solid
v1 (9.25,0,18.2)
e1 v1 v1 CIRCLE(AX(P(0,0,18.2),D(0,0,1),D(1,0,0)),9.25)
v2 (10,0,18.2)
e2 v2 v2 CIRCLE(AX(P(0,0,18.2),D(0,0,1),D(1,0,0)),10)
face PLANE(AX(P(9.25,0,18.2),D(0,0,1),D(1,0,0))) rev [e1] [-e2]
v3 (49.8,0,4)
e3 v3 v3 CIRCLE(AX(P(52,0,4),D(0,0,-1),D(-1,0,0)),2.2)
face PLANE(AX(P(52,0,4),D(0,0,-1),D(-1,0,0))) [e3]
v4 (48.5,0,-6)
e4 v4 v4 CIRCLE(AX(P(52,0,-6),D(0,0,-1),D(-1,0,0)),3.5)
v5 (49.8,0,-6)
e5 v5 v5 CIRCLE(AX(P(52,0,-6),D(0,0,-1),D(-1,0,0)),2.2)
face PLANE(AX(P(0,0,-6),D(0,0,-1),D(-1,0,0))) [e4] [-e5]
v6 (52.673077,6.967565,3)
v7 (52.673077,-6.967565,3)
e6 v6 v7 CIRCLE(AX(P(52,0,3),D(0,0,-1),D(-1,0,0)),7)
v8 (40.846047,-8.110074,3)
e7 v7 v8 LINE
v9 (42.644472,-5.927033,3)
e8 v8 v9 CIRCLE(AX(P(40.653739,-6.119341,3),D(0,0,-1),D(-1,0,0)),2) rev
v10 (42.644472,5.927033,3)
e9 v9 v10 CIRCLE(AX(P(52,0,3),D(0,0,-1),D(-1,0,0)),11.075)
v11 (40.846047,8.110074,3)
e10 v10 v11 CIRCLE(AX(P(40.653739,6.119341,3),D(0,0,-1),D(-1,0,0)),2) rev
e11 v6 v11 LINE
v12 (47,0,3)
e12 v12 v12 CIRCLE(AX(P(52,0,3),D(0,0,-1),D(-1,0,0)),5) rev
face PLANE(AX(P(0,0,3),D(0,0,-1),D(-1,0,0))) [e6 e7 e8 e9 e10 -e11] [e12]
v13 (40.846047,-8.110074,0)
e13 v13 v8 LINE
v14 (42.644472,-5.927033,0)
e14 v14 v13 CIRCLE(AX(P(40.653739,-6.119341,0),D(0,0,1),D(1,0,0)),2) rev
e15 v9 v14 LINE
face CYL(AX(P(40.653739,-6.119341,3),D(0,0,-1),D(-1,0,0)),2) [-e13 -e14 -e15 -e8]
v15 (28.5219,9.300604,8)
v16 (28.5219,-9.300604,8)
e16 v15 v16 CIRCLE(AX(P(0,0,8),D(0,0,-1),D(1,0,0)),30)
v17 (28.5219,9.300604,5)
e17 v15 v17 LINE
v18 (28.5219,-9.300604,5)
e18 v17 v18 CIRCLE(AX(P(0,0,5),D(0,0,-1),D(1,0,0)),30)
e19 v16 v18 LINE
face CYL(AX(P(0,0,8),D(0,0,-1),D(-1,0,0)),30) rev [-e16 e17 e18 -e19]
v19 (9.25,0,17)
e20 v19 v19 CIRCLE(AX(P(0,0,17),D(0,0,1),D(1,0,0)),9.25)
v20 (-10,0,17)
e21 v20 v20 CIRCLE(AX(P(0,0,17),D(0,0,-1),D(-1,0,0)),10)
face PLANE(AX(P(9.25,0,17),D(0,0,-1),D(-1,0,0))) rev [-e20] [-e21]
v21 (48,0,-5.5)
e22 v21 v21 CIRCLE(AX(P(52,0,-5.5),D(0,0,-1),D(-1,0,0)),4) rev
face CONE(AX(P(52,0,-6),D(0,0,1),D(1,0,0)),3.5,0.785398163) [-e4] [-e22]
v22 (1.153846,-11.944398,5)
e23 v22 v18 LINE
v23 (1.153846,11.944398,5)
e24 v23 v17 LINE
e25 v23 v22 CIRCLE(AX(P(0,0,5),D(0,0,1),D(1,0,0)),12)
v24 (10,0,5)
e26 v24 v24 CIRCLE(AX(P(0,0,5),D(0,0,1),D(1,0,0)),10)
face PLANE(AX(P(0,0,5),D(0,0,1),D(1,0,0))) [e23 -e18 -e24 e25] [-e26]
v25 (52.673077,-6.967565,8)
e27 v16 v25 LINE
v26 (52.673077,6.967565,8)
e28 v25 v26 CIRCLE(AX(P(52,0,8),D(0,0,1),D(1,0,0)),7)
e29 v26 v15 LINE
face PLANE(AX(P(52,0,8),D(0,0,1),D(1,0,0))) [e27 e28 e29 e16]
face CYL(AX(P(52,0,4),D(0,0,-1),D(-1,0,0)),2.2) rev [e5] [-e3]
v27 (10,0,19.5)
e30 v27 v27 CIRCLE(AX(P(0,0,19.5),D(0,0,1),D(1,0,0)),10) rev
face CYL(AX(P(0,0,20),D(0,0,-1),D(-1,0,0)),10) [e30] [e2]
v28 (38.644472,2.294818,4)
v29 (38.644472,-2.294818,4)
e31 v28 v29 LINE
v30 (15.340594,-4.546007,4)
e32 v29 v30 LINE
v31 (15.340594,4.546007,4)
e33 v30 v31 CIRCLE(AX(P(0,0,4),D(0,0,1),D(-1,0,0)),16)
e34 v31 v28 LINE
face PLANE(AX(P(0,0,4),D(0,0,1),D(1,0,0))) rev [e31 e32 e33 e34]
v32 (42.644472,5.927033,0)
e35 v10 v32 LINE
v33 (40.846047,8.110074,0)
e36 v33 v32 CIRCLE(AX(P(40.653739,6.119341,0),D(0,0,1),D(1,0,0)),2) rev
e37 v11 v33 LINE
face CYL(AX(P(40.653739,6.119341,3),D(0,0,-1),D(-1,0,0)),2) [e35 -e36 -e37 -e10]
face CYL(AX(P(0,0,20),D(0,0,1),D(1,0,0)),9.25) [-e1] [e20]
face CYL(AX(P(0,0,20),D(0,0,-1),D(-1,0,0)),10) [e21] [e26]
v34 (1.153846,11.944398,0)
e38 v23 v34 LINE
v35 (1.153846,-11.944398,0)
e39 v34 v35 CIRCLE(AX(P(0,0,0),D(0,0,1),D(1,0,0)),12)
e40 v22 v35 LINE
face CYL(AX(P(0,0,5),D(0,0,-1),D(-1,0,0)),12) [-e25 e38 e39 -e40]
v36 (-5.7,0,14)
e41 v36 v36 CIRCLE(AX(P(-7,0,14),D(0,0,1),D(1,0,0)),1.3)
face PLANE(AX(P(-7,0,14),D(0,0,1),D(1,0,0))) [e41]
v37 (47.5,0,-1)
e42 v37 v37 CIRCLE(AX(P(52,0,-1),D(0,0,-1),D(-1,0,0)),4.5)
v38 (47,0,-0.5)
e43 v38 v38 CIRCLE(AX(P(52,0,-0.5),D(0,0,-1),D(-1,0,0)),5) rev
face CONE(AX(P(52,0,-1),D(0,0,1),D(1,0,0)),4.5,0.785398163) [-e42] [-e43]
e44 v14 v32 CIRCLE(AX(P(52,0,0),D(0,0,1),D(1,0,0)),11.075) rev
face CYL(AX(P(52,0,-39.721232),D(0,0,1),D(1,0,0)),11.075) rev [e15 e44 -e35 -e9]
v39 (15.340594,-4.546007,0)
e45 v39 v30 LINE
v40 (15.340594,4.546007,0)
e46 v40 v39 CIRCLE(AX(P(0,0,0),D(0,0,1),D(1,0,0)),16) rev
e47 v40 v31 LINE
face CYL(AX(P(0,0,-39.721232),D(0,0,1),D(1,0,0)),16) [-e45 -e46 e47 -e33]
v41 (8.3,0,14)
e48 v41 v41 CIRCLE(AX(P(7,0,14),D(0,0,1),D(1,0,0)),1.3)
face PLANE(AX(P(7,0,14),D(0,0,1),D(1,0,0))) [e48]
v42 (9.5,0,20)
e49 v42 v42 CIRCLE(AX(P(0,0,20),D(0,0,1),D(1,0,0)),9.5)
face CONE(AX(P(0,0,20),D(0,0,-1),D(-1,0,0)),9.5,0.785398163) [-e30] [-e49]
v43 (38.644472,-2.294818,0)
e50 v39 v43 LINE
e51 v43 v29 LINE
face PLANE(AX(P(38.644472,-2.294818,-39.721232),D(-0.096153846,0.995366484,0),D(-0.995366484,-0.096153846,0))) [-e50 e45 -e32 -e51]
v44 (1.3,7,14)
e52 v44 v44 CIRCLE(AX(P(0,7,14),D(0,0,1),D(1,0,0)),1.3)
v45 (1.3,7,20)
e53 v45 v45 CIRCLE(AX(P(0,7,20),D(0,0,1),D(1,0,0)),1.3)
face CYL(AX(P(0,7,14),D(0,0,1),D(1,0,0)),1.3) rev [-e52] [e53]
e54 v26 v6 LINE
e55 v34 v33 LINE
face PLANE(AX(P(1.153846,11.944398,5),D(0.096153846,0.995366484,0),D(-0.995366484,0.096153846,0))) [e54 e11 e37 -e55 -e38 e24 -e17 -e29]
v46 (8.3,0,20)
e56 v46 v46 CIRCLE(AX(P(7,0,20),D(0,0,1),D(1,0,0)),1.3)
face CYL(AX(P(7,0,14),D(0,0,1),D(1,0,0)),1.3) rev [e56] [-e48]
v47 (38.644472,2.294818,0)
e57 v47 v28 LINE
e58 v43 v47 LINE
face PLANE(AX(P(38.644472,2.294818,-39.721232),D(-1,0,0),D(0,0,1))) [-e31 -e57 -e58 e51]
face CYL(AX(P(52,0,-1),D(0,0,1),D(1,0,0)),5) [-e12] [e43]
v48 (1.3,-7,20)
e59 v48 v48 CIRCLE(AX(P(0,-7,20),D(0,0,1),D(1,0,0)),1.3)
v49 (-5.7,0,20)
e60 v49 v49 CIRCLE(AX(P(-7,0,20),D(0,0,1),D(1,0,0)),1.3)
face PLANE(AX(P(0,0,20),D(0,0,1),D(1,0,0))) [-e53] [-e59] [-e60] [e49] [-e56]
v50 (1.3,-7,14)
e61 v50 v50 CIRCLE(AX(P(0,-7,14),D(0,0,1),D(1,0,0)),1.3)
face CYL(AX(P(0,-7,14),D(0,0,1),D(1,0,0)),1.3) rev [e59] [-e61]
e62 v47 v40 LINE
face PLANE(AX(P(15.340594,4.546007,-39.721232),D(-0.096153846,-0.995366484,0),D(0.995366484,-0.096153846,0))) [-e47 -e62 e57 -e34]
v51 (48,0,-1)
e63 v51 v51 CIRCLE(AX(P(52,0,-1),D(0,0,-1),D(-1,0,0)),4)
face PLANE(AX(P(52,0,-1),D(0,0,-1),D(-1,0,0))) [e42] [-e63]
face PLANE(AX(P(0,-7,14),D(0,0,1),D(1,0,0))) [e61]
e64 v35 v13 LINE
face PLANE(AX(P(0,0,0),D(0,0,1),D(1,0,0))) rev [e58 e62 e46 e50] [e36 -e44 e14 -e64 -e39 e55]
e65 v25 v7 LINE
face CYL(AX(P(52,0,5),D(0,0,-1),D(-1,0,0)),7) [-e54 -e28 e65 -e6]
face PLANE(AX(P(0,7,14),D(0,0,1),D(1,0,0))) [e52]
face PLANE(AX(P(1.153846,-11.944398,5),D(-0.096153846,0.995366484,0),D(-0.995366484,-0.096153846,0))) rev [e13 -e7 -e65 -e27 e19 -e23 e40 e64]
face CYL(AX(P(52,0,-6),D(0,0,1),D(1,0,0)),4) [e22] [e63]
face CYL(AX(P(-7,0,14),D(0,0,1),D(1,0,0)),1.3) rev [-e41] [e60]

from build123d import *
from build123d.topology import SkipClean

# Parameters (mm, degrees)
EXTRUDE_1_DEPTH     = 5
SKETCH_2_R          = 10
EXTRUDE_2_DEPTH     = 15
SKETCH_3_R          = 4
EXTRUDE_3_DEPTH     = 6
SKETCH_4_R          = 5
SKETCH_4_R_2        = 4
EXTRUDE_4_DEPTH     = 1
CHAMFER_1_SIZE      = 0.5
SKETCH_6_R          = 1.3
CUT_EXTRUDE_2_DEPTH = 6
SKETCH_11_R         = 2.2
CUT_EXTRUDE_7_DEPTH = 10
CUT_EXTRUDE_START   = -5
CUT_EXTRUDE_8_DEPTH = 5
SKETCH_14_R         = 5
CUT_EXTRUDE_9_DEPTH = 3
EXTRUDE_START       = -1
SKETCH_15_R         = 10
EXTRUDE_5_DEPTH     = 1
FILLET_1_R          = 2
SKETCH_16_W         = 4.663078912
SKETCH_16_H         = 1.2
EXTRUDE_6_DEPTH     = 4
EXTRUDE_START_2     = 1
EXTRUDE_7_DEPTH     = 1
EXTRUDE_8_DEPTH     = 3


with BuildPart() as part:
    # 草图1 → 凸台-拉伸1 (new body)
    with BuildSketch(Plane.XY):
        with BuildLine():
            Line((52.673076923, 6.967565389), (1.153846154, 11.94439781))
            ThreePointArc((1.153846154, 11.94439781), (-12, 0), (1.153846154, -11.94439781))
            Line((1.153846154, -11.94439781), (52.673076923, -6.967565389))
            ThreePointArc((52.673076923, -6.967565389), (59, 0), (52.673076923, 6.967565389))
        make_face()
    extrude(amount=EXTRUDE_1_DEPTH)

    # 草图2 → 凸台-拉伸2 (add)
    with BuildSketch(Plane.XY.offset(5)):
        Circle(SKETCH_2_R)
    extrude(amount=EXTRUDE_2_DEPTH)

    # 草图3 → 凸台-拉伸3 (add)
    with BuildSketch(Plane(origin=(0, 0, 0), x_dir=(-1, 0, 0), z_dir=(0, 0, -1))):
        with Locations((-52, 0)):
            Circle(SKETCH_3_R)
    extrude(amount=EXTRUDE_3_DEPTH)

    # 草图4 → 凸台-拉伸4 (add)
    with BuildSketch(Plane(origin=(0, 0, 0), x_dir=(-1, 0, 0), z_dir=(0, 0, -1))):
        with Locations(Location((-52, 0, 0), (0, 0, 180))):
            Circle(SKETCH_4_R)
        with Locations((-52, 0)):
            Circle(SKETCH_4_R_2, mode=Mode.SUBTRACT)
    extrude(amount=EXTRUDE_4_DEPTH)

    # 倒角1
    chamfer_1_edges = [part.edges().sort_by_distance(p)[0] for p in [
        (-10, 0, 20),
        (56, 0, -6),
        (47, 0, -1),
    ]]
    chamfer(chamfer_1_edges, length=CHAMFER_1_SIZE)

    # 草图6 → 切除-拉伸2 (cut)
    with BuildSketch(Plane.XY.offset(20)):
        with Locations((0, 7)):
            Circle(SKETCH_6_R)
        with Locations((7, 0)):
            Circle(SKETCH_6_R)
        with Locations((0, -7)):
            Circle(SKETCH_6_R)
        with Locations((-7, 0)):
            Circle(SKETCH_6_R)
    extrude(amount=-CUT_EXTRUDE_2_DEPTH, mode=Mode.SUBTRACT)

    # 草图11 → 切除-拉伸7 (cut)
    with BuildSketch(Plane(origin=(0, 0, -6), x_dir=(-1, 0, 0), z_dir=(0, 0, -1))):
        with Locations((-52, 0)):
            Circle(SKETCH_11_R)
    extrude(amount=-CUT_EXTRUDE_7_DEPTH, mode=Mode.SUBTRACT)

    # 草图12 → 切除-拉伸8 (cut)
    with BuildSketch(Plane.XY.offset(5).offset(CUT_EXTRUDE_START)):
        with BuildLine():
            Line((47.604489244, 5.447888141), (7.564052776, 9.315852382))
            ThreePointArc((7.564052776, 9.315852382), (10.834404305, 5.159038995), (12, 0))
            ThreePointArc((12, 0), (10.834404305, -5.159038995), (7.564052776, -9.315852382))
            Line((7.564052776, -9.315852382), (47.604489244, -5.447888141))
            ThreePointArc((47.604489244, -5.447888141), (45, 0), (47.604489244, 5.447888141))
        make_face()
    extrude(amount=CUT_EXTRUDE_8_DEPTH, mode=Mode.SUBTRACT)

    # 草图14 → 切除-拉伸9 (cut)
    # profile 1 of 2: a face of its own
    with BuildSketch(Plane(origin=(0, 0, 0), x_dir=(-1, 0, 0), z_dir=(0, 0, -1))):
        with BuildLine():
            Line((-52.673076923, 6.967565389), (-44.130557544, 7.792785152))
            ThreePointArc((-44.130557544, 7.792785152), (-63.075, 0), (-44.130557544, -7.792785152))
            Line((-44.130557544, -7.792785152), (-52.673076923, -6.967565389))
            ThreePointArc((-52.673076923, -6.967565389), (-59, 0), (-52.673076923, 6.967565389))
        make_face()
    # profile 2 of 2: a face of its own
    with BuildSketch(Plane(origin=(0, 0, 0), x_dir=(-1, 0, 0), z_dir=(0, 0, -1))):
        with BuildLine():
            ThreePointArc((-44.130557544, -7.792785152), (-41.757693126, -4.213166849), (-40.925, 0))
            ThreePointArc((-40.925, 0), (-41.757693126, 4.213166849), (-44.130557544, 7.792785152))
            Line((-44.130557544, 7.792785152), (-52.673076923, 6.967565389))
            ThreePointArc((-52.673076923, 6.967565389), (-59, 0), (-52.673076923, -6.967565389))
            Line((-52.673076923, -6.967565389), (-44.130557544, -7.792785152))
        make_face()
        with Locations((-52, 0)):
            Circle(SKETCH_14_R, mode=Mode.SUBTRACT)
    extrude(amount=-CUT_EXTRUDE_9_DEPTH, mode=Mode.SUBTRACT)

    # 草图15 → 凸台-拉伸5 (add)
    # profile 1 of 2: a face of its own
    with SkipClean():  # the faces are left unmerged after this step: merging them gives an invalid solid
        with BuildSketch(Plane.XY.offset(5).offset(EXTRUDE_START)):
            with BuildLine():
                ThreePointArc((1.153846154, 11.94439781), (-12, 0), (1.153846154, -11.94439781))
                Line((1.153846154, -11.94439781), (52.673076923, -6.967565389))
                ThreePointArc((52.673076923, -6.967565389), (59, 0), (52.673076923, 6.967565389))
                Line((52.673076923, 6.967565389), (1.153846154, 11.94439781))
            make_face()
            Circle(SKETCH_15_R, mode=Mode.SUBTRACT)
            with BuildLine():
                ThreePointArc((7.564052776, -9.315852382), (12, 0), (7.564052776, 9.315852382))
                Line((7.564052776, 9.315852382), (47.604489244, 5.447888141))
                ThreePointArc((47.604489244, 5.447888141), (45, 0), (47.604489244, -5.447888141))
                Line((47.604489244, -5.447888141), (7.564052776, -9.315852382))
            make_face(mode=Mode.SUBTRACT)
        # profile 2 of 2: a face of its own
        with BuildSketch(Plane.XY.offset(5).offset(EXTRUDE_START)):
            with BuildLine():
                Line((47.604489244, 5.447888141), (7.564052776, 9.315852382))
                ThreePointArc((7.564052776, 9.315852382), (12, 0), (7.564052776, -9.315852382))
                Line((7.564052776, -9.315852382), (47.604489244, -5.447888141))
                ThreePointArc((47.604489244, -5.447888141), (45, 0), (47.604489244, 5.447888141))
            make_face()
        extrude(amount=EXTRUDE_5_DEPTH)
    add(part.part.scale(1), mode=Mode.REPLACE)  # the faces are merged on a copy

    # 圆角1
    # the kernel refuses this fillet: 2 mm, written as the material it takes off along each edge
    with BuildSketch(Plane(origin=(44.130557544, -7.792785152, -8.249501326), x_dir=(-0.9953664842005795, -0.09615384615384645, 0), z_dir=(0, 0, 1)), Plane(origin=(44.130557544, 7.792785152, 3), x_dir=(-0.9953664842005796, 0.09615384615384538, 0), z_dir=(0, 0, -1))) as fillet_1_piece_1:
        with BuildLine():
            CenterArc((3.29980053, -2), FILLET_1_R, 90, 90)
            ThreePointArc((1.29980053, -2), (0.703900692, -0.964905108), (0, 0))
            Line((0, 0), (3.29980053, 0))
        make_face()
    extrude(amount=11.249501326, mode=Mode.SUBTRACT)

    # 草图16 → 切除-旋转1 (revolve, cut)
    with BuildSketch(Plane(origin=(0, 0, 0), x_dir=(1, 0, 0), z_dir=(0, 1, 0))):
        with Locations((11.581539456, -17.6)):
            Rectangle(SKETCH_16_W, SKETCH_16_H)
    revolve(axis=Axis((0, 0, 20), (0, 0, -1)), mode=Mode.SUBTRACT)

    # 草图17 → 凸台-拉伸6 (add)
    with BuildSketch(Plane(origin=(0, 0, 4), x_dir=(-1, 0, 0), z_dir=(0, 0, -1))):
        with BuildLine():
            Line((-7.564052776, 9.315852382), (-42.644471967, 5.927033004))
            ThreePointArc((-42.644471967, 5.927033004), (-40.925, 0), (-42.644471967, -5.927033004))
            Line((-42.644471967, -5.927033004), (-7.564052776, -9.315852382))
            ThreePointArc((-7.564052776, -9.315852382), (-12, 0), (-7.564052776, 9.315852382))
        make_face()
        with BuildLine():
            Line((-38.644471967, 2.294818465), (-38.644471967, -2.294818465))
            Line((-38.644471967, -2.294818465), (-15.340593905, -4.546006888))
            ThreePointArc((-15.340593905, -4.546006888), (-16, 0), (-15.340593905, 4.546006888))
            Line((-15.340593905, 4.546006888), (-38.644471967, 2.294818465))
        make_face(mode=Mode.SUBTRACT)
    extrude(amount=EXTRUDE_6_DEPTH)

    # 草图18 → 凸台-拉伸7 (add)
    with BuildSketch(Plane(origin=(0, 0, 4), x_dir=(-1, 0, 0), z_dir=(0, 0, -1)).offset(EXTRUDE_START_2)):
        with BuildLine():
            Line((-42.644471967, 5.927033004), (-47.604489244, 5.447888141))
            ThreePointArc((-47.604489244, 5.447888141), (-45, 0), (-47.604489244, -5.447888141))
            Line((-47.604489244, -5.447888141), (-42.644471967, -5.927033004))
            ThreePointArc((-42.644471967, -5.927033004), (-40.925, 0), (-42.644471967, 5.927033004))
        make_face()
    extrude(amount=-EXTRUDE_7_DEPTH)

    # 草图19 → 凸台-拉伸8 (add)
    with BuildSketch(Plane.XY.offset(5)):
        with BuildLine():
            Line((28.521899702, -9.30060414), (52.673076923, -6.967565389))
            ThreePointArc((52.673076923, -6.967565389), (59, 0), (52.673076923, 6.967565389))
            Line((52.673076923, 6.967565389), (28.521899702, 9.30060414))
            ThreePointArc((28.521899702, 9.30060414), (30, 0), (28.521899702, -9.30060414))
        make_face()
    extrude(amount=EXTRUDE_8_DEPTH)


solid = part.part
